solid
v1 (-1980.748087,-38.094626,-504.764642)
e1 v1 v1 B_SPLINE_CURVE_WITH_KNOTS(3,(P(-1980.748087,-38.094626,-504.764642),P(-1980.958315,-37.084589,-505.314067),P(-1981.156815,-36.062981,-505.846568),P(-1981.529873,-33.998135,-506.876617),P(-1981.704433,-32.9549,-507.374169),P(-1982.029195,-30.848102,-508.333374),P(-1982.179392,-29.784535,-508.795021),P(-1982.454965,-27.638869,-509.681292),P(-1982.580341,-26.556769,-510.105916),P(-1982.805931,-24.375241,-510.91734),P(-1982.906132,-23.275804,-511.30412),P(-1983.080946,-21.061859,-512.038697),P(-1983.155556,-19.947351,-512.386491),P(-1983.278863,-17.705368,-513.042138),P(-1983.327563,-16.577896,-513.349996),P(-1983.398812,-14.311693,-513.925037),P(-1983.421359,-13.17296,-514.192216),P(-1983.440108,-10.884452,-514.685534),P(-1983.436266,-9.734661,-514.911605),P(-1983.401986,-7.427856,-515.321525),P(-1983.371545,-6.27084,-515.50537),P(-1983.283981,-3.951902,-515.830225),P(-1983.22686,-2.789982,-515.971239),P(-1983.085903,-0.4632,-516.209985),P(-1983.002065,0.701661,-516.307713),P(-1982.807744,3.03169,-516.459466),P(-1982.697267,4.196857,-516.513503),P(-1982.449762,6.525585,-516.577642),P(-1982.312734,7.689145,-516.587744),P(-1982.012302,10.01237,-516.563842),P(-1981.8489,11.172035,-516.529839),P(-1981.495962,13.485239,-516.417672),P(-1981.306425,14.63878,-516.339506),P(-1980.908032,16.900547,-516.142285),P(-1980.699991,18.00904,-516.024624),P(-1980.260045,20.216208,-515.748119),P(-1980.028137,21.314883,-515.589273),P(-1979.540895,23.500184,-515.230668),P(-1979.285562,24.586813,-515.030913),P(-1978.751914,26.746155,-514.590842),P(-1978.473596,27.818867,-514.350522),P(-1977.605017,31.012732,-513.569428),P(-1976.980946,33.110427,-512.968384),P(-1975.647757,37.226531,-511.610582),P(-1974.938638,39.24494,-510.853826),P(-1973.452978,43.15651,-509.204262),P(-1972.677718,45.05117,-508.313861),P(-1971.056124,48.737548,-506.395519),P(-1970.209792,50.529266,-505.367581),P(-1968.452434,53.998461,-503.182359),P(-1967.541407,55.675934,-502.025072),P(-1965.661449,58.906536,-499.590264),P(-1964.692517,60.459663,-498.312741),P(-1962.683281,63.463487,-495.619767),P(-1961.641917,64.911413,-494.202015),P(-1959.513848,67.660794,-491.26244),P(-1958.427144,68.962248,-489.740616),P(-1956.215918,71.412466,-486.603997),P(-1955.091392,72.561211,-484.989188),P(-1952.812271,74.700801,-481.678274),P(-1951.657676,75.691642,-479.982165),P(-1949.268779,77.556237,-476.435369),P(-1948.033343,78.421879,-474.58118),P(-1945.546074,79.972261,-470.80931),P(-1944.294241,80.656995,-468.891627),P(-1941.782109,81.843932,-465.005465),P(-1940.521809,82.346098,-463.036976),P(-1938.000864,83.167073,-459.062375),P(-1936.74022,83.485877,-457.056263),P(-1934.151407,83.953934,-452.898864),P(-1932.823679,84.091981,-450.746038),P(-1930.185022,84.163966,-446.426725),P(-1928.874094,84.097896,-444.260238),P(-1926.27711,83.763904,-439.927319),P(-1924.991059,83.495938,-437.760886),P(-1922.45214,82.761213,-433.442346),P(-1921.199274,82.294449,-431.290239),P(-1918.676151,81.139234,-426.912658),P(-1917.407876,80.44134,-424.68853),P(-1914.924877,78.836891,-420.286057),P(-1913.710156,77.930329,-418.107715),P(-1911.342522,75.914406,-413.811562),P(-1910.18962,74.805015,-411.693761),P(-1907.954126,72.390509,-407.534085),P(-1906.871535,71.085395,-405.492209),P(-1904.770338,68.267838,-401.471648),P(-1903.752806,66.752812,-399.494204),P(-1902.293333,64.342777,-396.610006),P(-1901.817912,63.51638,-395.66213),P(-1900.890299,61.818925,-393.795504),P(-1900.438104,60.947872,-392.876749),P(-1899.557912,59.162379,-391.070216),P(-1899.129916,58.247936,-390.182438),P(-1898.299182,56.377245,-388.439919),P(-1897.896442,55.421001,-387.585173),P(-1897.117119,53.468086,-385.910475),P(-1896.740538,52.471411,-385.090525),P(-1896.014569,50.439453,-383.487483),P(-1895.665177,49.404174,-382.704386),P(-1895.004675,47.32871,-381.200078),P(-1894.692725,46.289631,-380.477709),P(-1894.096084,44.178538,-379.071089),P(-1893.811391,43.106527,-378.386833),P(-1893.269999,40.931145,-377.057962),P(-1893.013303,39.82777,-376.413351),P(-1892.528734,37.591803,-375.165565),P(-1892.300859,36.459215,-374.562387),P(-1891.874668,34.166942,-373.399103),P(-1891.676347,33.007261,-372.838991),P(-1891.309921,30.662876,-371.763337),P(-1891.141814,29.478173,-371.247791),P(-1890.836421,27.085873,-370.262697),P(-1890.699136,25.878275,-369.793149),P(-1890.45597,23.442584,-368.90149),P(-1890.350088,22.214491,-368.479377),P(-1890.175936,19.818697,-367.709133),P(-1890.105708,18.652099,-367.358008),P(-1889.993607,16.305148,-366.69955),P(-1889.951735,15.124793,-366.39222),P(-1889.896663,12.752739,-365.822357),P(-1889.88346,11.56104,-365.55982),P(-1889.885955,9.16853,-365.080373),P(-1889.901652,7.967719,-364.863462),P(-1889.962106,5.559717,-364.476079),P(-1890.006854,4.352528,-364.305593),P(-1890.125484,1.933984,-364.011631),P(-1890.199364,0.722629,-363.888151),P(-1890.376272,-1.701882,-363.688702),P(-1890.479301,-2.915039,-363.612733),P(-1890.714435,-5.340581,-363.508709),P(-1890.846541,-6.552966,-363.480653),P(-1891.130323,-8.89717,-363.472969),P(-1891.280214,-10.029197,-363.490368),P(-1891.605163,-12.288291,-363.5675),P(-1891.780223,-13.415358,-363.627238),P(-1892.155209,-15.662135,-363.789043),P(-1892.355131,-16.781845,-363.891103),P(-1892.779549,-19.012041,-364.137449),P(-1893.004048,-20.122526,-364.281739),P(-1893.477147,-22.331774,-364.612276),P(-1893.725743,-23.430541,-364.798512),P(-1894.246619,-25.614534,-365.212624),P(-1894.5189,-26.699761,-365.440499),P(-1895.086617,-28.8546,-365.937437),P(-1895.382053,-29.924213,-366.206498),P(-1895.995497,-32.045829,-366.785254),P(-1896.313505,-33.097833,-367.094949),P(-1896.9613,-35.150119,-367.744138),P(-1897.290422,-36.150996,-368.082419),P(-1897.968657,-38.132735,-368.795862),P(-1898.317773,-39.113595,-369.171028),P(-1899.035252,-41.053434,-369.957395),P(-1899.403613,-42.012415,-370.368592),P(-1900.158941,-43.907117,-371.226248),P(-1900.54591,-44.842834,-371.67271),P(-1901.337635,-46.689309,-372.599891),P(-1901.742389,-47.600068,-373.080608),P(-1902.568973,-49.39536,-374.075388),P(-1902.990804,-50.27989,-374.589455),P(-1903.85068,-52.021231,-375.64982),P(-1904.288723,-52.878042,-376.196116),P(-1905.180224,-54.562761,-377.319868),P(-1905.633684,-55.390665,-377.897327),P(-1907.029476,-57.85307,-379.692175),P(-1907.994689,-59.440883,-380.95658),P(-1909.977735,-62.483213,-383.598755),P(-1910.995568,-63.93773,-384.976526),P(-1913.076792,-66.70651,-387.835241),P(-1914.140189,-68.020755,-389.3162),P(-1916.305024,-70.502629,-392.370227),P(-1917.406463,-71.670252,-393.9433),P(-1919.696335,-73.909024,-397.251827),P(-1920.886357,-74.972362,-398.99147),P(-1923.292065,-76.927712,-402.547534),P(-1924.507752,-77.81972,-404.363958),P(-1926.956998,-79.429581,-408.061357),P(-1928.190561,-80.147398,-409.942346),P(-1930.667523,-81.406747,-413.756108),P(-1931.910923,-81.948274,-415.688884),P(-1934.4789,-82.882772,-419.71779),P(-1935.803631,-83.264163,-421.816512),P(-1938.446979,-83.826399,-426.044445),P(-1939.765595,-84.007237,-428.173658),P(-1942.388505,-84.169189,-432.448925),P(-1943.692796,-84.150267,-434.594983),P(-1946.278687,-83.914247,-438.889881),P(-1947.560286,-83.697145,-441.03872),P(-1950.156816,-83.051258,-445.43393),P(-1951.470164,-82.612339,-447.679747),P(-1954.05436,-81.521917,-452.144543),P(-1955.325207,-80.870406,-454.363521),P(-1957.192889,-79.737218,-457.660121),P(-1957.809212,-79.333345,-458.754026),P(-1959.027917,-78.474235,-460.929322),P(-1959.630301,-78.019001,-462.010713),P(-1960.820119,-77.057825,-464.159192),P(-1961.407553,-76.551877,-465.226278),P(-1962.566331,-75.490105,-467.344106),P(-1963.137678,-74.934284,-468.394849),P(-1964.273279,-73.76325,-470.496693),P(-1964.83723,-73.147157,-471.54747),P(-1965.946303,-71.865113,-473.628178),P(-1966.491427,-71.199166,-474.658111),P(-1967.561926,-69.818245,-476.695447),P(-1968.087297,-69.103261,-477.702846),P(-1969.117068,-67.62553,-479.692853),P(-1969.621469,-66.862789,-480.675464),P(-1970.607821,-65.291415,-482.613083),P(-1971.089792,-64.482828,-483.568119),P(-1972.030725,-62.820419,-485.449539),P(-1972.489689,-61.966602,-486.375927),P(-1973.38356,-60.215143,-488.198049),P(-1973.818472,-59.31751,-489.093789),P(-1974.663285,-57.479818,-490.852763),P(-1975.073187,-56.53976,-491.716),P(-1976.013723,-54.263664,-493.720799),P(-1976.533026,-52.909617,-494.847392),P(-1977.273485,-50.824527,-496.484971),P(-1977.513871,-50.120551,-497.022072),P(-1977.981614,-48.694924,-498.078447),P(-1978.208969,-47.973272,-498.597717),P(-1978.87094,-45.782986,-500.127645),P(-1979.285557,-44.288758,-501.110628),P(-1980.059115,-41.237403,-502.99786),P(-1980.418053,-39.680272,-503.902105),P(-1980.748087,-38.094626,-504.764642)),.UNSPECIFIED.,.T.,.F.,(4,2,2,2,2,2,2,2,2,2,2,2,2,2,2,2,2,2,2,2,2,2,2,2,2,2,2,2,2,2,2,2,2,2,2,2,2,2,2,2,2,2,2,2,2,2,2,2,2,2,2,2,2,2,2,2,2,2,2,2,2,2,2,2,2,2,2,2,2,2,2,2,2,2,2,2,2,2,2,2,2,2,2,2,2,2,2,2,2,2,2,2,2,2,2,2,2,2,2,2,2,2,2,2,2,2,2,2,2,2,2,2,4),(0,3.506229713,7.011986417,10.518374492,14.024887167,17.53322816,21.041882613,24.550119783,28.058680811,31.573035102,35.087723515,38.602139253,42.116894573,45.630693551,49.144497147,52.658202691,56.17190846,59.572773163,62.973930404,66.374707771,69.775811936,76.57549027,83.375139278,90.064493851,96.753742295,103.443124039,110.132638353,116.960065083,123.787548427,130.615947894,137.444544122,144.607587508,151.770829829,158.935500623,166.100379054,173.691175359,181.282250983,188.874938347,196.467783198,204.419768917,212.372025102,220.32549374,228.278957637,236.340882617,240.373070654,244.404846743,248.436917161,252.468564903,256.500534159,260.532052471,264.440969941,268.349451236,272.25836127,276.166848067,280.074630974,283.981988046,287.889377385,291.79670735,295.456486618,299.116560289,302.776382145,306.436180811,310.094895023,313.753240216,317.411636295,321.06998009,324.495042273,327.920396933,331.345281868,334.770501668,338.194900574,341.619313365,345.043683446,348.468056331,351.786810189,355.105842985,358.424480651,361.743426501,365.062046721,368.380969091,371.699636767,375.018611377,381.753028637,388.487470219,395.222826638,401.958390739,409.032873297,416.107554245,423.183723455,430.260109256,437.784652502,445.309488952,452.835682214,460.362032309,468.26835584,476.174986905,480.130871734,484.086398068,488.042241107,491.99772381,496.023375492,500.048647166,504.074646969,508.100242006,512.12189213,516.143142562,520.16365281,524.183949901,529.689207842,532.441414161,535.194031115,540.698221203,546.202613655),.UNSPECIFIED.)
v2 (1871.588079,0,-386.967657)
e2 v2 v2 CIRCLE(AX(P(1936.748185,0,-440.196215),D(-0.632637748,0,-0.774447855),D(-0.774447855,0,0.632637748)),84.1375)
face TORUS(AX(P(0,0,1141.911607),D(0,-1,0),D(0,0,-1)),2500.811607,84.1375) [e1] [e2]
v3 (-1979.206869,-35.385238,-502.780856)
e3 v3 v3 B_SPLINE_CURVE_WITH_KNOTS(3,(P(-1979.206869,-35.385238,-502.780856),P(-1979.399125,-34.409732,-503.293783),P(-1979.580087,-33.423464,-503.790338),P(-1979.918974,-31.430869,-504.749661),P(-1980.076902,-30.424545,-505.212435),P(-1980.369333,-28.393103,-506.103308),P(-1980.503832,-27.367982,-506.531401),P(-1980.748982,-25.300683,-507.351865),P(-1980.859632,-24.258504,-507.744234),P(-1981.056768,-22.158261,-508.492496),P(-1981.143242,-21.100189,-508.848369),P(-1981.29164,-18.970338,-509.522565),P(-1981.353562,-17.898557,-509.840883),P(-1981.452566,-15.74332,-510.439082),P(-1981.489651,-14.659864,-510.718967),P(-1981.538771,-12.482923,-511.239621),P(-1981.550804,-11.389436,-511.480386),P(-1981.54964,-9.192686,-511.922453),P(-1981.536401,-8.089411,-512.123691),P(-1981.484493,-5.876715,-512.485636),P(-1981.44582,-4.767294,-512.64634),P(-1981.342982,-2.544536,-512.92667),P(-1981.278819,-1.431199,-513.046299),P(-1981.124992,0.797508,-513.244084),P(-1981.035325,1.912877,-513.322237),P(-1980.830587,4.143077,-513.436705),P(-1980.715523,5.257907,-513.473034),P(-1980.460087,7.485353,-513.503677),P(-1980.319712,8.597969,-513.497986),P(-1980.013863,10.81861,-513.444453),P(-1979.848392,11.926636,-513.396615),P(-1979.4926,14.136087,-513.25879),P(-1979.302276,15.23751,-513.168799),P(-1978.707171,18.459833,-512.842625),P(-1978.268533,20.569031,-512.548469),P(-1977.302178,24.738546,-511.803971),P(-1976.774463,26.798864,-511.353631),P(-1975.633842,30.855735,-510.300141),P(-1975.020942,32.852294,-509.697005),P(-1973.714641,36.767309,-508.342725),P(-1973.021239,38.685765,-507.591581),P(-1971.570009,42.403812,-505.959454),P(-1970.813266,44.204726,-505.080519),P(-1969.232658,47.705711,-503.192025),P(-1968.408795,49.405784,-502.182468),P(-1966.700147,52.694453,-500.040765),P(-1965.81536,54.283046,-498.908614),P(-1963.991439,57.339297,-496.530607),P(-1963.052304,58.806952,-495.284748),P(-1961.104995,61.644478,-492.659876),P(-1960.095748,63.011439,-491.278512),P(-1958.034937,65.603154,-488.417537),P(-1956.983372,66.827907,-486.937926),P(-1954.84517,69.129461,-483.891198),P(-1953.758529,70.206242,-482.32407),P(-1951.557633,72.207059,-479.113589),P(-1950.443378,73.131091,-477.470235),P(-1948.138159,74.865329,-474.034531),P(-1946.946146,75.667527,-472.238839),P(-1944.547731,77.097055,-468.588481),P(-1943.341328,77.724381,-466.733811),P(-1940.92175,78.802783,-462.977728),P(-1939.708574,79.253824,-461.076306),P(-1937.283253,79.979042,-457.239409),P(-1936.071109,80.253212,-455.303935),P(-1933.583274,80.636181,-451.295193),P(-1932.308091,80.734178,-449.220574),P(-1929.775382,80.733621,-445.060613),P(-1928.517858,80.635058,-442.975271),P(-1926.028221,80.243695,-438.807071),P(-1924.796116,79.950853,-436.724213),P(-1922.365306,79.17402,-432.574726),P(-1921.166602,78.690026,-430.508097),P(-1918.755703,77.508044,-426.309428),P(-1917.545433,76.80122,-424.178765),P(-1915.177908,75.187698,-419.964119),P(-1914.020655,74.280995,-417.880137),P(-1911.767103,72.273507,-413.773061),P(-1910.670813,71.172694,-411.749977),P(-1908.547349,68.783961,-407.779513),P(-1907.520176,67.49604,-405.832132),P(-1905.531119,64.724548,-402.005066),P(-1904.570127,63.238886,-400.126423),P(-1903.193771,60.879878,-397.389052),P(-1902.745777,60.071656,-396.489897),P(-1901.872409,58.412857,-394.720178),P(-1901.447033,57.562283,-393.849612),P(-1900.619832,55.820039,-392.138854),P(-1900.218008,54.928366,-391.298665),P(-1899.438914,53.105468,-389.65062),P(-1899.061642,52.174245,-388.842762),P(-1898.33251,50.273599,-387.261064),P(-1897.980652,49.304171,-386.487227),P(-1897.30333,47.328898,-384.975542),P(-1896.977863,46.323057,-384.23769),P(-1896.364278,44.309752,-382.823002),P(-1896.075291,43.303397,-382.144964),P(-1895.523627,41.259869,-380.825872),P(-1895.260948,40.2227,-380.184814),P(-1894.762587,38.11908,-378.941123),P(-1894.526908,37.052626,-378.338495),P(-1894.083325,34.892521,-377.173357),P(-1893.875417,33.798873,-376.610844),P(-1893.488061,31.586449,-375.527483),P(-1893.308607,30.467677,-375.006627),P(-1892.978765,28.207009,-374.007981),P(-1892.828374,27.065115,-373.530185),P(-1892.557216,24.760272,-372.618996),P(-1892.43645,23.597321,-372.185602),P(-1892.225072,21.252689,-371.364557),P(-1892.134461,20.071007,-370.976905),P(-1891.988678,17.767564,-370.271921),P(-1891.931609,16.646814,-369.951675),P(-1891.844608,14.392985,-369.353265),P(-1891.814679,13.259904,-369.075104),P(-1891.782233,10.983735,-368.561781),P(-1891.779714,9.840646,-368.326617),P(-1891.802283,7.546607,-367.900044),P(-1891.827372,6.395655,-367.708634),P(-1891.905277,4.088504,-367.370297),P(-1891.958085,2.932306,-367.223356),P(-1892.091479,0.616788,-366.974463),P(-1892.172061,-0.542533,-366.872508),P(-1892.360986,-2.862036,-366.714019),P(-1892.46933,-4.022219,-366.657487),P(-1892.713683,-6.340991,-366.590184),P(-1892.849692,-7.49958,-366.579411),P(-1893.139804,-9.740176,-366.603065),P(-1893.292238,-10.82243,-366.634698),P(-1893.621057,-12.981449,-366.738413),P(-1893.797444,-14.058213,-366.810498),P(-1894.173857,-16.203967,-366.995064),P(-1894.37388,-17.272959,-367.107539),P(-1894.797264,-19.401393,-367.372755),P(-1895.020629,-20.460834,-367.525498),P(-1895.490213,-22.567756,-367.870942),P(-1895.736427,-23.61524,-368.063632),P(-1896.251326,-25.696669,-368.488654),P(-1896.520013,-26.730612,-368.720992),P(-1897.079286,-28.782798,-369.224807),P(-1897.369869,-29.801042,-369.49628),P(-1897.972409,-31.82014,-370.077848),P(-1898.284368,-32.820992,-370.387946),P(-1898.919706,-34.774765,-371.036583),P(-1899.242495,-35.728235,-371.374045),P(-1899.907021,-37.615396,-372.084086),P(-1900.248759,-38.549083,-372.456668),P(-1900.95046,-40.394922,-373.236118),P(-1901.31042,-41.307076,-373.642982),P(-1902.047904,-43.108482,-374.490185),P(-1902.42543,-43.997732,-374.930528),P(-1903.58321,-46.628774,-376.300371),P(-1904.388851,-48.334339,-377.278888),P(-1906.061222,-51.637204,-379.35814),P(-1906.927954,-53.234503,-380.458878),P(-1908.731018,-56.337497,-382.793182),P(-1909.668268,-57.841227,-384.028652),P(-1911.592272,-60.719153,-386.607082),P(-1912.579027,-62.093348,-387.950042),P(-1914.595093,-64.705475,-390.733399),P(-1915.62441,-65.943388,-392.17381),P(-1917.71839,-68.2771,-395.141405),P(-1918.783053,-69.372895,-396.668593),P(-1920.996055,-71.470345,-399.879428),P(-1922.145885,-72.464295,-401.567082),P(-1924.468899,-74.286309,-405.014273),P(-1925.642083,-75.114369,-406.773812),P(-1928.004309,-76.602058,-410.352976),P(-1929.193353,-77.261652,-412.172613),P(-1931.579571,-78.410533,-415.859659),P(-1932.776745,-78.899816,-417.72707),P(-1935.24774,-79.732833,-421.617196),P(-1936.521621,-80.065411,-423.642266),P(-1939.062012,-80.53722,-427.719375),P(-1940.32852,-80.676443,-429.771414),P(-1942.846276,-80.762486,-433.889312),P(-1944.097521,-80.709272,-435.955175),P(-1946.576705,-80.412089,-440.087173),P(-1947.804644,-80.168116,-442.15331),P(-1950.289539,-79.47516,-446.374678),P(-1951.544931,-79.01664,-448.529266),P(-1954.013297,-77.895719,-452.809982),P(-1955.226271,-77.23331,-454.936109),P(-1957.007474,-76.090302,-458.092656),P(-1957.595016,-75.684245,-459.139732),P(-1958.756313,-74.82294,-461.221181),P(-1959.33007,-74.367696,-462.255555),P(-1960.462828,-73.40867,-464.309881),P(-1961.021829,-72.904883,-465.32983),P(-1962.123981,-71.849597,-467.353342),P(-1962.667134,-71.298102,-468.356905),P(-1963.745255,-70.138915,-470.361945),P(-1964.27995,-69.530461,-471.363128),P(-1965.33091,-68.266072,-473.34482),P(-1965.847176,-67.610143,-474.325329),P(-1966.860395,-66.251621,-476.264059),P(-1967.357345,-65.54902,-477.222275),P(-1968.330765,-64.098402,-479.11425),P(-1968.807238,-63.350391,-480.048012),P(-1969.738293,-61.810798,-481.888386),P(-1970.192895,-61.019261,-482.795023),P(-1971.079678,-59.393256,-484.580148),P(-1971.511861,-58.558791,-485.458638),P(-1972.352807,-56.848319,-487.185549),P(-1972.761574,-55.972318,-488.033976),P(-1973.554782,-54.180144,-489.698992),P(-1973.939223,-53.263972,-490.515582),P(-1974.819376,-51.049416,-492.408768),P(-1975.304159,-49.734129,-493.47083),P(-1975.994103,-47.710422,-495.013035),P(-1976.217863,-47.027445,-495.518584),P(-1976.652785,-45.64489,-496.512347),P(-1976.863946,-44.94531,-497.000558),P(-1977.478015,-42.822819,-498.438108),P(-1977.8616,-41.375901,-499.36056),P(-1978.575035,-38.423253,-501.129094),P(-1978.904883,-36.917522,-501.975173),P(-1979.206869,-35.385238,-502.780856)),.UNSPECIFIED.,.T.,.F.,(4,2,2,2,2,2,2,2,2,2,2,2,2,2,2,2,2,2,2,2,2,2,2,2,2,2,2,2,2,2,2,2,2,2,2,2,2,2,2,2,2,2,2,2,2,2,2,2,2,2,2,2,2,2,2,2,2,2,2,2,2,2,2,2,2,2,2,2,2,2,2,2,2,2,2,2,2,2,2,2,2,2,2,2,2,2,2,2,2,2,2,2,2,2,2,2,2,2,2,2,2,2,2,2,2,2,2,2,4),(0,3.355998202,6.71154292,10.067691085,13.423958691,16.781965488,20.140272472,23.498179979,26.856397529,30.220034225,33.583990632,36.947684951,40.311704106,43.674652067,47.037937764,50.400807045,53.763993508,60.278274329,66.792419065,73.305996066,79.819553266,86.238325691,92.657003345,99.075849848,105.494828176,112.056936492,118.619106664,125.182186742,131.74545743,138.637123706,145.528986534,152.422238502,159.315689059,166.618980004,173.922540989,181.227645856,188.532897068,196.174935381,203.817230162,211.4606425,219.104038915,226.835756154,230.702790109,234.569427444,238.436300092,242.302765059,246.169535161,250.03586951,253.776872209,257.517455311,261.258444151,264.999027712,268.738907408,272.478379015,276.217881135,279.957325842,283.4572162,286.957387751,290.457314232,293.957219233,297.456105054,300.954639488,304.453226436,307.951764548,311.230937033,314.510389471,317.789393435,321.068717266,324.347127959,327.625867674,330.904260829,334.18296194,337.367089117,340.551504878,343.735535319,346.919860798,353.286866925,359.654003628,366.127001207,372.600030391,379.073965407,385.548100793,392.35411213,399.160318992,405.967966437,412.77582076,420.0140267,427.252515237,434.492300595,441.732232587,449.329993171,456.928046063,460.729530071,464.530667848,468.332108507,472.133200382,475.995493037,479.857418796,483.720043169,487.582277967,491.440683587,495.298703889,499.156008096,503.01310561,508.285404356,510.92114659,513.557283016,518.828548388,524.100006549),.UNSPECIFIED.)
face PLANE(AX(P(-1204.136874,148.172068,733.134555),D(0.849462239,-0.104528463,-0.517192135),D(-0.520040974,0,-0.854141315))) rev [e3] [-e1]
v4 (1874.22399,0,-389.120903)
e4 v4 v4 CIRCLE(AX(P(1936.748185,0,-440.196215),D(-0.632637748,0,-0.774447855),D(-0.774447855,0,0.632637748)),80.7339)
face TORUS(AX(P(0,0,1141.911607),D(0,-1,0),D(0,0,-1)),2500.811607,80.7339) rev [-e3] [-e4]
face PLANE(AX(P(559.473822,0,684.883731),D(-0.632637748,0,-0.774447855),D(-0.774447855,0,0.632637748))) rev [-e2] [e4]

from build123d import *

# Parameters (mm, degrees)
TUBE_OUTLINE_R   = 84.1375
TUBE_OUTLINE_R_2 = 80.7339
TUBE_ANGLE       = 125.66203


# Read off the part's stored shape, not the designer's step: tube
with BuildPart() as part:
    # tube outline → tube (revolve)
    with BuildSketch(Plane(origin=(0, 0, 1141.911607404), x_dir=(0.8896636769492224, 0, -0.4566164056592685), z_dir=(0.4566164056592685, 0, 0.8896636769492224))):
        with Locations((2500.811607404, 0)):
            Circle(TUBE_OUTLINE_R)
        with Locations((2500.811607404, 0)):
            Circle(TUBE_OUTLINE_R_2, mode=Mode.SUBTRACT)
    revolve(axis=Axis((0, 0, 1141.911607404), (0, 1, 0)), revolution_arc=TUBE_ANGLE)

    # right_trim
    split(bisect_by=Plane(origin=(559.473821641, 0, 684.883731267), x_dir=(0, -1, 0), z_dir=(-0.632637748, 0, -0.774447855)), keep=Keep.TOP)

    # pipe4-trim
    split(bisect_by=Plane(origin=(-1204.136873732, 148.172068381, 733.134555259), x_dir=(0.122131336, 0.992513948, 0), z_dir=(0.849462239, -0.104528463, -0.517192135)), keep=Keep.TOP)


solid = part.part
